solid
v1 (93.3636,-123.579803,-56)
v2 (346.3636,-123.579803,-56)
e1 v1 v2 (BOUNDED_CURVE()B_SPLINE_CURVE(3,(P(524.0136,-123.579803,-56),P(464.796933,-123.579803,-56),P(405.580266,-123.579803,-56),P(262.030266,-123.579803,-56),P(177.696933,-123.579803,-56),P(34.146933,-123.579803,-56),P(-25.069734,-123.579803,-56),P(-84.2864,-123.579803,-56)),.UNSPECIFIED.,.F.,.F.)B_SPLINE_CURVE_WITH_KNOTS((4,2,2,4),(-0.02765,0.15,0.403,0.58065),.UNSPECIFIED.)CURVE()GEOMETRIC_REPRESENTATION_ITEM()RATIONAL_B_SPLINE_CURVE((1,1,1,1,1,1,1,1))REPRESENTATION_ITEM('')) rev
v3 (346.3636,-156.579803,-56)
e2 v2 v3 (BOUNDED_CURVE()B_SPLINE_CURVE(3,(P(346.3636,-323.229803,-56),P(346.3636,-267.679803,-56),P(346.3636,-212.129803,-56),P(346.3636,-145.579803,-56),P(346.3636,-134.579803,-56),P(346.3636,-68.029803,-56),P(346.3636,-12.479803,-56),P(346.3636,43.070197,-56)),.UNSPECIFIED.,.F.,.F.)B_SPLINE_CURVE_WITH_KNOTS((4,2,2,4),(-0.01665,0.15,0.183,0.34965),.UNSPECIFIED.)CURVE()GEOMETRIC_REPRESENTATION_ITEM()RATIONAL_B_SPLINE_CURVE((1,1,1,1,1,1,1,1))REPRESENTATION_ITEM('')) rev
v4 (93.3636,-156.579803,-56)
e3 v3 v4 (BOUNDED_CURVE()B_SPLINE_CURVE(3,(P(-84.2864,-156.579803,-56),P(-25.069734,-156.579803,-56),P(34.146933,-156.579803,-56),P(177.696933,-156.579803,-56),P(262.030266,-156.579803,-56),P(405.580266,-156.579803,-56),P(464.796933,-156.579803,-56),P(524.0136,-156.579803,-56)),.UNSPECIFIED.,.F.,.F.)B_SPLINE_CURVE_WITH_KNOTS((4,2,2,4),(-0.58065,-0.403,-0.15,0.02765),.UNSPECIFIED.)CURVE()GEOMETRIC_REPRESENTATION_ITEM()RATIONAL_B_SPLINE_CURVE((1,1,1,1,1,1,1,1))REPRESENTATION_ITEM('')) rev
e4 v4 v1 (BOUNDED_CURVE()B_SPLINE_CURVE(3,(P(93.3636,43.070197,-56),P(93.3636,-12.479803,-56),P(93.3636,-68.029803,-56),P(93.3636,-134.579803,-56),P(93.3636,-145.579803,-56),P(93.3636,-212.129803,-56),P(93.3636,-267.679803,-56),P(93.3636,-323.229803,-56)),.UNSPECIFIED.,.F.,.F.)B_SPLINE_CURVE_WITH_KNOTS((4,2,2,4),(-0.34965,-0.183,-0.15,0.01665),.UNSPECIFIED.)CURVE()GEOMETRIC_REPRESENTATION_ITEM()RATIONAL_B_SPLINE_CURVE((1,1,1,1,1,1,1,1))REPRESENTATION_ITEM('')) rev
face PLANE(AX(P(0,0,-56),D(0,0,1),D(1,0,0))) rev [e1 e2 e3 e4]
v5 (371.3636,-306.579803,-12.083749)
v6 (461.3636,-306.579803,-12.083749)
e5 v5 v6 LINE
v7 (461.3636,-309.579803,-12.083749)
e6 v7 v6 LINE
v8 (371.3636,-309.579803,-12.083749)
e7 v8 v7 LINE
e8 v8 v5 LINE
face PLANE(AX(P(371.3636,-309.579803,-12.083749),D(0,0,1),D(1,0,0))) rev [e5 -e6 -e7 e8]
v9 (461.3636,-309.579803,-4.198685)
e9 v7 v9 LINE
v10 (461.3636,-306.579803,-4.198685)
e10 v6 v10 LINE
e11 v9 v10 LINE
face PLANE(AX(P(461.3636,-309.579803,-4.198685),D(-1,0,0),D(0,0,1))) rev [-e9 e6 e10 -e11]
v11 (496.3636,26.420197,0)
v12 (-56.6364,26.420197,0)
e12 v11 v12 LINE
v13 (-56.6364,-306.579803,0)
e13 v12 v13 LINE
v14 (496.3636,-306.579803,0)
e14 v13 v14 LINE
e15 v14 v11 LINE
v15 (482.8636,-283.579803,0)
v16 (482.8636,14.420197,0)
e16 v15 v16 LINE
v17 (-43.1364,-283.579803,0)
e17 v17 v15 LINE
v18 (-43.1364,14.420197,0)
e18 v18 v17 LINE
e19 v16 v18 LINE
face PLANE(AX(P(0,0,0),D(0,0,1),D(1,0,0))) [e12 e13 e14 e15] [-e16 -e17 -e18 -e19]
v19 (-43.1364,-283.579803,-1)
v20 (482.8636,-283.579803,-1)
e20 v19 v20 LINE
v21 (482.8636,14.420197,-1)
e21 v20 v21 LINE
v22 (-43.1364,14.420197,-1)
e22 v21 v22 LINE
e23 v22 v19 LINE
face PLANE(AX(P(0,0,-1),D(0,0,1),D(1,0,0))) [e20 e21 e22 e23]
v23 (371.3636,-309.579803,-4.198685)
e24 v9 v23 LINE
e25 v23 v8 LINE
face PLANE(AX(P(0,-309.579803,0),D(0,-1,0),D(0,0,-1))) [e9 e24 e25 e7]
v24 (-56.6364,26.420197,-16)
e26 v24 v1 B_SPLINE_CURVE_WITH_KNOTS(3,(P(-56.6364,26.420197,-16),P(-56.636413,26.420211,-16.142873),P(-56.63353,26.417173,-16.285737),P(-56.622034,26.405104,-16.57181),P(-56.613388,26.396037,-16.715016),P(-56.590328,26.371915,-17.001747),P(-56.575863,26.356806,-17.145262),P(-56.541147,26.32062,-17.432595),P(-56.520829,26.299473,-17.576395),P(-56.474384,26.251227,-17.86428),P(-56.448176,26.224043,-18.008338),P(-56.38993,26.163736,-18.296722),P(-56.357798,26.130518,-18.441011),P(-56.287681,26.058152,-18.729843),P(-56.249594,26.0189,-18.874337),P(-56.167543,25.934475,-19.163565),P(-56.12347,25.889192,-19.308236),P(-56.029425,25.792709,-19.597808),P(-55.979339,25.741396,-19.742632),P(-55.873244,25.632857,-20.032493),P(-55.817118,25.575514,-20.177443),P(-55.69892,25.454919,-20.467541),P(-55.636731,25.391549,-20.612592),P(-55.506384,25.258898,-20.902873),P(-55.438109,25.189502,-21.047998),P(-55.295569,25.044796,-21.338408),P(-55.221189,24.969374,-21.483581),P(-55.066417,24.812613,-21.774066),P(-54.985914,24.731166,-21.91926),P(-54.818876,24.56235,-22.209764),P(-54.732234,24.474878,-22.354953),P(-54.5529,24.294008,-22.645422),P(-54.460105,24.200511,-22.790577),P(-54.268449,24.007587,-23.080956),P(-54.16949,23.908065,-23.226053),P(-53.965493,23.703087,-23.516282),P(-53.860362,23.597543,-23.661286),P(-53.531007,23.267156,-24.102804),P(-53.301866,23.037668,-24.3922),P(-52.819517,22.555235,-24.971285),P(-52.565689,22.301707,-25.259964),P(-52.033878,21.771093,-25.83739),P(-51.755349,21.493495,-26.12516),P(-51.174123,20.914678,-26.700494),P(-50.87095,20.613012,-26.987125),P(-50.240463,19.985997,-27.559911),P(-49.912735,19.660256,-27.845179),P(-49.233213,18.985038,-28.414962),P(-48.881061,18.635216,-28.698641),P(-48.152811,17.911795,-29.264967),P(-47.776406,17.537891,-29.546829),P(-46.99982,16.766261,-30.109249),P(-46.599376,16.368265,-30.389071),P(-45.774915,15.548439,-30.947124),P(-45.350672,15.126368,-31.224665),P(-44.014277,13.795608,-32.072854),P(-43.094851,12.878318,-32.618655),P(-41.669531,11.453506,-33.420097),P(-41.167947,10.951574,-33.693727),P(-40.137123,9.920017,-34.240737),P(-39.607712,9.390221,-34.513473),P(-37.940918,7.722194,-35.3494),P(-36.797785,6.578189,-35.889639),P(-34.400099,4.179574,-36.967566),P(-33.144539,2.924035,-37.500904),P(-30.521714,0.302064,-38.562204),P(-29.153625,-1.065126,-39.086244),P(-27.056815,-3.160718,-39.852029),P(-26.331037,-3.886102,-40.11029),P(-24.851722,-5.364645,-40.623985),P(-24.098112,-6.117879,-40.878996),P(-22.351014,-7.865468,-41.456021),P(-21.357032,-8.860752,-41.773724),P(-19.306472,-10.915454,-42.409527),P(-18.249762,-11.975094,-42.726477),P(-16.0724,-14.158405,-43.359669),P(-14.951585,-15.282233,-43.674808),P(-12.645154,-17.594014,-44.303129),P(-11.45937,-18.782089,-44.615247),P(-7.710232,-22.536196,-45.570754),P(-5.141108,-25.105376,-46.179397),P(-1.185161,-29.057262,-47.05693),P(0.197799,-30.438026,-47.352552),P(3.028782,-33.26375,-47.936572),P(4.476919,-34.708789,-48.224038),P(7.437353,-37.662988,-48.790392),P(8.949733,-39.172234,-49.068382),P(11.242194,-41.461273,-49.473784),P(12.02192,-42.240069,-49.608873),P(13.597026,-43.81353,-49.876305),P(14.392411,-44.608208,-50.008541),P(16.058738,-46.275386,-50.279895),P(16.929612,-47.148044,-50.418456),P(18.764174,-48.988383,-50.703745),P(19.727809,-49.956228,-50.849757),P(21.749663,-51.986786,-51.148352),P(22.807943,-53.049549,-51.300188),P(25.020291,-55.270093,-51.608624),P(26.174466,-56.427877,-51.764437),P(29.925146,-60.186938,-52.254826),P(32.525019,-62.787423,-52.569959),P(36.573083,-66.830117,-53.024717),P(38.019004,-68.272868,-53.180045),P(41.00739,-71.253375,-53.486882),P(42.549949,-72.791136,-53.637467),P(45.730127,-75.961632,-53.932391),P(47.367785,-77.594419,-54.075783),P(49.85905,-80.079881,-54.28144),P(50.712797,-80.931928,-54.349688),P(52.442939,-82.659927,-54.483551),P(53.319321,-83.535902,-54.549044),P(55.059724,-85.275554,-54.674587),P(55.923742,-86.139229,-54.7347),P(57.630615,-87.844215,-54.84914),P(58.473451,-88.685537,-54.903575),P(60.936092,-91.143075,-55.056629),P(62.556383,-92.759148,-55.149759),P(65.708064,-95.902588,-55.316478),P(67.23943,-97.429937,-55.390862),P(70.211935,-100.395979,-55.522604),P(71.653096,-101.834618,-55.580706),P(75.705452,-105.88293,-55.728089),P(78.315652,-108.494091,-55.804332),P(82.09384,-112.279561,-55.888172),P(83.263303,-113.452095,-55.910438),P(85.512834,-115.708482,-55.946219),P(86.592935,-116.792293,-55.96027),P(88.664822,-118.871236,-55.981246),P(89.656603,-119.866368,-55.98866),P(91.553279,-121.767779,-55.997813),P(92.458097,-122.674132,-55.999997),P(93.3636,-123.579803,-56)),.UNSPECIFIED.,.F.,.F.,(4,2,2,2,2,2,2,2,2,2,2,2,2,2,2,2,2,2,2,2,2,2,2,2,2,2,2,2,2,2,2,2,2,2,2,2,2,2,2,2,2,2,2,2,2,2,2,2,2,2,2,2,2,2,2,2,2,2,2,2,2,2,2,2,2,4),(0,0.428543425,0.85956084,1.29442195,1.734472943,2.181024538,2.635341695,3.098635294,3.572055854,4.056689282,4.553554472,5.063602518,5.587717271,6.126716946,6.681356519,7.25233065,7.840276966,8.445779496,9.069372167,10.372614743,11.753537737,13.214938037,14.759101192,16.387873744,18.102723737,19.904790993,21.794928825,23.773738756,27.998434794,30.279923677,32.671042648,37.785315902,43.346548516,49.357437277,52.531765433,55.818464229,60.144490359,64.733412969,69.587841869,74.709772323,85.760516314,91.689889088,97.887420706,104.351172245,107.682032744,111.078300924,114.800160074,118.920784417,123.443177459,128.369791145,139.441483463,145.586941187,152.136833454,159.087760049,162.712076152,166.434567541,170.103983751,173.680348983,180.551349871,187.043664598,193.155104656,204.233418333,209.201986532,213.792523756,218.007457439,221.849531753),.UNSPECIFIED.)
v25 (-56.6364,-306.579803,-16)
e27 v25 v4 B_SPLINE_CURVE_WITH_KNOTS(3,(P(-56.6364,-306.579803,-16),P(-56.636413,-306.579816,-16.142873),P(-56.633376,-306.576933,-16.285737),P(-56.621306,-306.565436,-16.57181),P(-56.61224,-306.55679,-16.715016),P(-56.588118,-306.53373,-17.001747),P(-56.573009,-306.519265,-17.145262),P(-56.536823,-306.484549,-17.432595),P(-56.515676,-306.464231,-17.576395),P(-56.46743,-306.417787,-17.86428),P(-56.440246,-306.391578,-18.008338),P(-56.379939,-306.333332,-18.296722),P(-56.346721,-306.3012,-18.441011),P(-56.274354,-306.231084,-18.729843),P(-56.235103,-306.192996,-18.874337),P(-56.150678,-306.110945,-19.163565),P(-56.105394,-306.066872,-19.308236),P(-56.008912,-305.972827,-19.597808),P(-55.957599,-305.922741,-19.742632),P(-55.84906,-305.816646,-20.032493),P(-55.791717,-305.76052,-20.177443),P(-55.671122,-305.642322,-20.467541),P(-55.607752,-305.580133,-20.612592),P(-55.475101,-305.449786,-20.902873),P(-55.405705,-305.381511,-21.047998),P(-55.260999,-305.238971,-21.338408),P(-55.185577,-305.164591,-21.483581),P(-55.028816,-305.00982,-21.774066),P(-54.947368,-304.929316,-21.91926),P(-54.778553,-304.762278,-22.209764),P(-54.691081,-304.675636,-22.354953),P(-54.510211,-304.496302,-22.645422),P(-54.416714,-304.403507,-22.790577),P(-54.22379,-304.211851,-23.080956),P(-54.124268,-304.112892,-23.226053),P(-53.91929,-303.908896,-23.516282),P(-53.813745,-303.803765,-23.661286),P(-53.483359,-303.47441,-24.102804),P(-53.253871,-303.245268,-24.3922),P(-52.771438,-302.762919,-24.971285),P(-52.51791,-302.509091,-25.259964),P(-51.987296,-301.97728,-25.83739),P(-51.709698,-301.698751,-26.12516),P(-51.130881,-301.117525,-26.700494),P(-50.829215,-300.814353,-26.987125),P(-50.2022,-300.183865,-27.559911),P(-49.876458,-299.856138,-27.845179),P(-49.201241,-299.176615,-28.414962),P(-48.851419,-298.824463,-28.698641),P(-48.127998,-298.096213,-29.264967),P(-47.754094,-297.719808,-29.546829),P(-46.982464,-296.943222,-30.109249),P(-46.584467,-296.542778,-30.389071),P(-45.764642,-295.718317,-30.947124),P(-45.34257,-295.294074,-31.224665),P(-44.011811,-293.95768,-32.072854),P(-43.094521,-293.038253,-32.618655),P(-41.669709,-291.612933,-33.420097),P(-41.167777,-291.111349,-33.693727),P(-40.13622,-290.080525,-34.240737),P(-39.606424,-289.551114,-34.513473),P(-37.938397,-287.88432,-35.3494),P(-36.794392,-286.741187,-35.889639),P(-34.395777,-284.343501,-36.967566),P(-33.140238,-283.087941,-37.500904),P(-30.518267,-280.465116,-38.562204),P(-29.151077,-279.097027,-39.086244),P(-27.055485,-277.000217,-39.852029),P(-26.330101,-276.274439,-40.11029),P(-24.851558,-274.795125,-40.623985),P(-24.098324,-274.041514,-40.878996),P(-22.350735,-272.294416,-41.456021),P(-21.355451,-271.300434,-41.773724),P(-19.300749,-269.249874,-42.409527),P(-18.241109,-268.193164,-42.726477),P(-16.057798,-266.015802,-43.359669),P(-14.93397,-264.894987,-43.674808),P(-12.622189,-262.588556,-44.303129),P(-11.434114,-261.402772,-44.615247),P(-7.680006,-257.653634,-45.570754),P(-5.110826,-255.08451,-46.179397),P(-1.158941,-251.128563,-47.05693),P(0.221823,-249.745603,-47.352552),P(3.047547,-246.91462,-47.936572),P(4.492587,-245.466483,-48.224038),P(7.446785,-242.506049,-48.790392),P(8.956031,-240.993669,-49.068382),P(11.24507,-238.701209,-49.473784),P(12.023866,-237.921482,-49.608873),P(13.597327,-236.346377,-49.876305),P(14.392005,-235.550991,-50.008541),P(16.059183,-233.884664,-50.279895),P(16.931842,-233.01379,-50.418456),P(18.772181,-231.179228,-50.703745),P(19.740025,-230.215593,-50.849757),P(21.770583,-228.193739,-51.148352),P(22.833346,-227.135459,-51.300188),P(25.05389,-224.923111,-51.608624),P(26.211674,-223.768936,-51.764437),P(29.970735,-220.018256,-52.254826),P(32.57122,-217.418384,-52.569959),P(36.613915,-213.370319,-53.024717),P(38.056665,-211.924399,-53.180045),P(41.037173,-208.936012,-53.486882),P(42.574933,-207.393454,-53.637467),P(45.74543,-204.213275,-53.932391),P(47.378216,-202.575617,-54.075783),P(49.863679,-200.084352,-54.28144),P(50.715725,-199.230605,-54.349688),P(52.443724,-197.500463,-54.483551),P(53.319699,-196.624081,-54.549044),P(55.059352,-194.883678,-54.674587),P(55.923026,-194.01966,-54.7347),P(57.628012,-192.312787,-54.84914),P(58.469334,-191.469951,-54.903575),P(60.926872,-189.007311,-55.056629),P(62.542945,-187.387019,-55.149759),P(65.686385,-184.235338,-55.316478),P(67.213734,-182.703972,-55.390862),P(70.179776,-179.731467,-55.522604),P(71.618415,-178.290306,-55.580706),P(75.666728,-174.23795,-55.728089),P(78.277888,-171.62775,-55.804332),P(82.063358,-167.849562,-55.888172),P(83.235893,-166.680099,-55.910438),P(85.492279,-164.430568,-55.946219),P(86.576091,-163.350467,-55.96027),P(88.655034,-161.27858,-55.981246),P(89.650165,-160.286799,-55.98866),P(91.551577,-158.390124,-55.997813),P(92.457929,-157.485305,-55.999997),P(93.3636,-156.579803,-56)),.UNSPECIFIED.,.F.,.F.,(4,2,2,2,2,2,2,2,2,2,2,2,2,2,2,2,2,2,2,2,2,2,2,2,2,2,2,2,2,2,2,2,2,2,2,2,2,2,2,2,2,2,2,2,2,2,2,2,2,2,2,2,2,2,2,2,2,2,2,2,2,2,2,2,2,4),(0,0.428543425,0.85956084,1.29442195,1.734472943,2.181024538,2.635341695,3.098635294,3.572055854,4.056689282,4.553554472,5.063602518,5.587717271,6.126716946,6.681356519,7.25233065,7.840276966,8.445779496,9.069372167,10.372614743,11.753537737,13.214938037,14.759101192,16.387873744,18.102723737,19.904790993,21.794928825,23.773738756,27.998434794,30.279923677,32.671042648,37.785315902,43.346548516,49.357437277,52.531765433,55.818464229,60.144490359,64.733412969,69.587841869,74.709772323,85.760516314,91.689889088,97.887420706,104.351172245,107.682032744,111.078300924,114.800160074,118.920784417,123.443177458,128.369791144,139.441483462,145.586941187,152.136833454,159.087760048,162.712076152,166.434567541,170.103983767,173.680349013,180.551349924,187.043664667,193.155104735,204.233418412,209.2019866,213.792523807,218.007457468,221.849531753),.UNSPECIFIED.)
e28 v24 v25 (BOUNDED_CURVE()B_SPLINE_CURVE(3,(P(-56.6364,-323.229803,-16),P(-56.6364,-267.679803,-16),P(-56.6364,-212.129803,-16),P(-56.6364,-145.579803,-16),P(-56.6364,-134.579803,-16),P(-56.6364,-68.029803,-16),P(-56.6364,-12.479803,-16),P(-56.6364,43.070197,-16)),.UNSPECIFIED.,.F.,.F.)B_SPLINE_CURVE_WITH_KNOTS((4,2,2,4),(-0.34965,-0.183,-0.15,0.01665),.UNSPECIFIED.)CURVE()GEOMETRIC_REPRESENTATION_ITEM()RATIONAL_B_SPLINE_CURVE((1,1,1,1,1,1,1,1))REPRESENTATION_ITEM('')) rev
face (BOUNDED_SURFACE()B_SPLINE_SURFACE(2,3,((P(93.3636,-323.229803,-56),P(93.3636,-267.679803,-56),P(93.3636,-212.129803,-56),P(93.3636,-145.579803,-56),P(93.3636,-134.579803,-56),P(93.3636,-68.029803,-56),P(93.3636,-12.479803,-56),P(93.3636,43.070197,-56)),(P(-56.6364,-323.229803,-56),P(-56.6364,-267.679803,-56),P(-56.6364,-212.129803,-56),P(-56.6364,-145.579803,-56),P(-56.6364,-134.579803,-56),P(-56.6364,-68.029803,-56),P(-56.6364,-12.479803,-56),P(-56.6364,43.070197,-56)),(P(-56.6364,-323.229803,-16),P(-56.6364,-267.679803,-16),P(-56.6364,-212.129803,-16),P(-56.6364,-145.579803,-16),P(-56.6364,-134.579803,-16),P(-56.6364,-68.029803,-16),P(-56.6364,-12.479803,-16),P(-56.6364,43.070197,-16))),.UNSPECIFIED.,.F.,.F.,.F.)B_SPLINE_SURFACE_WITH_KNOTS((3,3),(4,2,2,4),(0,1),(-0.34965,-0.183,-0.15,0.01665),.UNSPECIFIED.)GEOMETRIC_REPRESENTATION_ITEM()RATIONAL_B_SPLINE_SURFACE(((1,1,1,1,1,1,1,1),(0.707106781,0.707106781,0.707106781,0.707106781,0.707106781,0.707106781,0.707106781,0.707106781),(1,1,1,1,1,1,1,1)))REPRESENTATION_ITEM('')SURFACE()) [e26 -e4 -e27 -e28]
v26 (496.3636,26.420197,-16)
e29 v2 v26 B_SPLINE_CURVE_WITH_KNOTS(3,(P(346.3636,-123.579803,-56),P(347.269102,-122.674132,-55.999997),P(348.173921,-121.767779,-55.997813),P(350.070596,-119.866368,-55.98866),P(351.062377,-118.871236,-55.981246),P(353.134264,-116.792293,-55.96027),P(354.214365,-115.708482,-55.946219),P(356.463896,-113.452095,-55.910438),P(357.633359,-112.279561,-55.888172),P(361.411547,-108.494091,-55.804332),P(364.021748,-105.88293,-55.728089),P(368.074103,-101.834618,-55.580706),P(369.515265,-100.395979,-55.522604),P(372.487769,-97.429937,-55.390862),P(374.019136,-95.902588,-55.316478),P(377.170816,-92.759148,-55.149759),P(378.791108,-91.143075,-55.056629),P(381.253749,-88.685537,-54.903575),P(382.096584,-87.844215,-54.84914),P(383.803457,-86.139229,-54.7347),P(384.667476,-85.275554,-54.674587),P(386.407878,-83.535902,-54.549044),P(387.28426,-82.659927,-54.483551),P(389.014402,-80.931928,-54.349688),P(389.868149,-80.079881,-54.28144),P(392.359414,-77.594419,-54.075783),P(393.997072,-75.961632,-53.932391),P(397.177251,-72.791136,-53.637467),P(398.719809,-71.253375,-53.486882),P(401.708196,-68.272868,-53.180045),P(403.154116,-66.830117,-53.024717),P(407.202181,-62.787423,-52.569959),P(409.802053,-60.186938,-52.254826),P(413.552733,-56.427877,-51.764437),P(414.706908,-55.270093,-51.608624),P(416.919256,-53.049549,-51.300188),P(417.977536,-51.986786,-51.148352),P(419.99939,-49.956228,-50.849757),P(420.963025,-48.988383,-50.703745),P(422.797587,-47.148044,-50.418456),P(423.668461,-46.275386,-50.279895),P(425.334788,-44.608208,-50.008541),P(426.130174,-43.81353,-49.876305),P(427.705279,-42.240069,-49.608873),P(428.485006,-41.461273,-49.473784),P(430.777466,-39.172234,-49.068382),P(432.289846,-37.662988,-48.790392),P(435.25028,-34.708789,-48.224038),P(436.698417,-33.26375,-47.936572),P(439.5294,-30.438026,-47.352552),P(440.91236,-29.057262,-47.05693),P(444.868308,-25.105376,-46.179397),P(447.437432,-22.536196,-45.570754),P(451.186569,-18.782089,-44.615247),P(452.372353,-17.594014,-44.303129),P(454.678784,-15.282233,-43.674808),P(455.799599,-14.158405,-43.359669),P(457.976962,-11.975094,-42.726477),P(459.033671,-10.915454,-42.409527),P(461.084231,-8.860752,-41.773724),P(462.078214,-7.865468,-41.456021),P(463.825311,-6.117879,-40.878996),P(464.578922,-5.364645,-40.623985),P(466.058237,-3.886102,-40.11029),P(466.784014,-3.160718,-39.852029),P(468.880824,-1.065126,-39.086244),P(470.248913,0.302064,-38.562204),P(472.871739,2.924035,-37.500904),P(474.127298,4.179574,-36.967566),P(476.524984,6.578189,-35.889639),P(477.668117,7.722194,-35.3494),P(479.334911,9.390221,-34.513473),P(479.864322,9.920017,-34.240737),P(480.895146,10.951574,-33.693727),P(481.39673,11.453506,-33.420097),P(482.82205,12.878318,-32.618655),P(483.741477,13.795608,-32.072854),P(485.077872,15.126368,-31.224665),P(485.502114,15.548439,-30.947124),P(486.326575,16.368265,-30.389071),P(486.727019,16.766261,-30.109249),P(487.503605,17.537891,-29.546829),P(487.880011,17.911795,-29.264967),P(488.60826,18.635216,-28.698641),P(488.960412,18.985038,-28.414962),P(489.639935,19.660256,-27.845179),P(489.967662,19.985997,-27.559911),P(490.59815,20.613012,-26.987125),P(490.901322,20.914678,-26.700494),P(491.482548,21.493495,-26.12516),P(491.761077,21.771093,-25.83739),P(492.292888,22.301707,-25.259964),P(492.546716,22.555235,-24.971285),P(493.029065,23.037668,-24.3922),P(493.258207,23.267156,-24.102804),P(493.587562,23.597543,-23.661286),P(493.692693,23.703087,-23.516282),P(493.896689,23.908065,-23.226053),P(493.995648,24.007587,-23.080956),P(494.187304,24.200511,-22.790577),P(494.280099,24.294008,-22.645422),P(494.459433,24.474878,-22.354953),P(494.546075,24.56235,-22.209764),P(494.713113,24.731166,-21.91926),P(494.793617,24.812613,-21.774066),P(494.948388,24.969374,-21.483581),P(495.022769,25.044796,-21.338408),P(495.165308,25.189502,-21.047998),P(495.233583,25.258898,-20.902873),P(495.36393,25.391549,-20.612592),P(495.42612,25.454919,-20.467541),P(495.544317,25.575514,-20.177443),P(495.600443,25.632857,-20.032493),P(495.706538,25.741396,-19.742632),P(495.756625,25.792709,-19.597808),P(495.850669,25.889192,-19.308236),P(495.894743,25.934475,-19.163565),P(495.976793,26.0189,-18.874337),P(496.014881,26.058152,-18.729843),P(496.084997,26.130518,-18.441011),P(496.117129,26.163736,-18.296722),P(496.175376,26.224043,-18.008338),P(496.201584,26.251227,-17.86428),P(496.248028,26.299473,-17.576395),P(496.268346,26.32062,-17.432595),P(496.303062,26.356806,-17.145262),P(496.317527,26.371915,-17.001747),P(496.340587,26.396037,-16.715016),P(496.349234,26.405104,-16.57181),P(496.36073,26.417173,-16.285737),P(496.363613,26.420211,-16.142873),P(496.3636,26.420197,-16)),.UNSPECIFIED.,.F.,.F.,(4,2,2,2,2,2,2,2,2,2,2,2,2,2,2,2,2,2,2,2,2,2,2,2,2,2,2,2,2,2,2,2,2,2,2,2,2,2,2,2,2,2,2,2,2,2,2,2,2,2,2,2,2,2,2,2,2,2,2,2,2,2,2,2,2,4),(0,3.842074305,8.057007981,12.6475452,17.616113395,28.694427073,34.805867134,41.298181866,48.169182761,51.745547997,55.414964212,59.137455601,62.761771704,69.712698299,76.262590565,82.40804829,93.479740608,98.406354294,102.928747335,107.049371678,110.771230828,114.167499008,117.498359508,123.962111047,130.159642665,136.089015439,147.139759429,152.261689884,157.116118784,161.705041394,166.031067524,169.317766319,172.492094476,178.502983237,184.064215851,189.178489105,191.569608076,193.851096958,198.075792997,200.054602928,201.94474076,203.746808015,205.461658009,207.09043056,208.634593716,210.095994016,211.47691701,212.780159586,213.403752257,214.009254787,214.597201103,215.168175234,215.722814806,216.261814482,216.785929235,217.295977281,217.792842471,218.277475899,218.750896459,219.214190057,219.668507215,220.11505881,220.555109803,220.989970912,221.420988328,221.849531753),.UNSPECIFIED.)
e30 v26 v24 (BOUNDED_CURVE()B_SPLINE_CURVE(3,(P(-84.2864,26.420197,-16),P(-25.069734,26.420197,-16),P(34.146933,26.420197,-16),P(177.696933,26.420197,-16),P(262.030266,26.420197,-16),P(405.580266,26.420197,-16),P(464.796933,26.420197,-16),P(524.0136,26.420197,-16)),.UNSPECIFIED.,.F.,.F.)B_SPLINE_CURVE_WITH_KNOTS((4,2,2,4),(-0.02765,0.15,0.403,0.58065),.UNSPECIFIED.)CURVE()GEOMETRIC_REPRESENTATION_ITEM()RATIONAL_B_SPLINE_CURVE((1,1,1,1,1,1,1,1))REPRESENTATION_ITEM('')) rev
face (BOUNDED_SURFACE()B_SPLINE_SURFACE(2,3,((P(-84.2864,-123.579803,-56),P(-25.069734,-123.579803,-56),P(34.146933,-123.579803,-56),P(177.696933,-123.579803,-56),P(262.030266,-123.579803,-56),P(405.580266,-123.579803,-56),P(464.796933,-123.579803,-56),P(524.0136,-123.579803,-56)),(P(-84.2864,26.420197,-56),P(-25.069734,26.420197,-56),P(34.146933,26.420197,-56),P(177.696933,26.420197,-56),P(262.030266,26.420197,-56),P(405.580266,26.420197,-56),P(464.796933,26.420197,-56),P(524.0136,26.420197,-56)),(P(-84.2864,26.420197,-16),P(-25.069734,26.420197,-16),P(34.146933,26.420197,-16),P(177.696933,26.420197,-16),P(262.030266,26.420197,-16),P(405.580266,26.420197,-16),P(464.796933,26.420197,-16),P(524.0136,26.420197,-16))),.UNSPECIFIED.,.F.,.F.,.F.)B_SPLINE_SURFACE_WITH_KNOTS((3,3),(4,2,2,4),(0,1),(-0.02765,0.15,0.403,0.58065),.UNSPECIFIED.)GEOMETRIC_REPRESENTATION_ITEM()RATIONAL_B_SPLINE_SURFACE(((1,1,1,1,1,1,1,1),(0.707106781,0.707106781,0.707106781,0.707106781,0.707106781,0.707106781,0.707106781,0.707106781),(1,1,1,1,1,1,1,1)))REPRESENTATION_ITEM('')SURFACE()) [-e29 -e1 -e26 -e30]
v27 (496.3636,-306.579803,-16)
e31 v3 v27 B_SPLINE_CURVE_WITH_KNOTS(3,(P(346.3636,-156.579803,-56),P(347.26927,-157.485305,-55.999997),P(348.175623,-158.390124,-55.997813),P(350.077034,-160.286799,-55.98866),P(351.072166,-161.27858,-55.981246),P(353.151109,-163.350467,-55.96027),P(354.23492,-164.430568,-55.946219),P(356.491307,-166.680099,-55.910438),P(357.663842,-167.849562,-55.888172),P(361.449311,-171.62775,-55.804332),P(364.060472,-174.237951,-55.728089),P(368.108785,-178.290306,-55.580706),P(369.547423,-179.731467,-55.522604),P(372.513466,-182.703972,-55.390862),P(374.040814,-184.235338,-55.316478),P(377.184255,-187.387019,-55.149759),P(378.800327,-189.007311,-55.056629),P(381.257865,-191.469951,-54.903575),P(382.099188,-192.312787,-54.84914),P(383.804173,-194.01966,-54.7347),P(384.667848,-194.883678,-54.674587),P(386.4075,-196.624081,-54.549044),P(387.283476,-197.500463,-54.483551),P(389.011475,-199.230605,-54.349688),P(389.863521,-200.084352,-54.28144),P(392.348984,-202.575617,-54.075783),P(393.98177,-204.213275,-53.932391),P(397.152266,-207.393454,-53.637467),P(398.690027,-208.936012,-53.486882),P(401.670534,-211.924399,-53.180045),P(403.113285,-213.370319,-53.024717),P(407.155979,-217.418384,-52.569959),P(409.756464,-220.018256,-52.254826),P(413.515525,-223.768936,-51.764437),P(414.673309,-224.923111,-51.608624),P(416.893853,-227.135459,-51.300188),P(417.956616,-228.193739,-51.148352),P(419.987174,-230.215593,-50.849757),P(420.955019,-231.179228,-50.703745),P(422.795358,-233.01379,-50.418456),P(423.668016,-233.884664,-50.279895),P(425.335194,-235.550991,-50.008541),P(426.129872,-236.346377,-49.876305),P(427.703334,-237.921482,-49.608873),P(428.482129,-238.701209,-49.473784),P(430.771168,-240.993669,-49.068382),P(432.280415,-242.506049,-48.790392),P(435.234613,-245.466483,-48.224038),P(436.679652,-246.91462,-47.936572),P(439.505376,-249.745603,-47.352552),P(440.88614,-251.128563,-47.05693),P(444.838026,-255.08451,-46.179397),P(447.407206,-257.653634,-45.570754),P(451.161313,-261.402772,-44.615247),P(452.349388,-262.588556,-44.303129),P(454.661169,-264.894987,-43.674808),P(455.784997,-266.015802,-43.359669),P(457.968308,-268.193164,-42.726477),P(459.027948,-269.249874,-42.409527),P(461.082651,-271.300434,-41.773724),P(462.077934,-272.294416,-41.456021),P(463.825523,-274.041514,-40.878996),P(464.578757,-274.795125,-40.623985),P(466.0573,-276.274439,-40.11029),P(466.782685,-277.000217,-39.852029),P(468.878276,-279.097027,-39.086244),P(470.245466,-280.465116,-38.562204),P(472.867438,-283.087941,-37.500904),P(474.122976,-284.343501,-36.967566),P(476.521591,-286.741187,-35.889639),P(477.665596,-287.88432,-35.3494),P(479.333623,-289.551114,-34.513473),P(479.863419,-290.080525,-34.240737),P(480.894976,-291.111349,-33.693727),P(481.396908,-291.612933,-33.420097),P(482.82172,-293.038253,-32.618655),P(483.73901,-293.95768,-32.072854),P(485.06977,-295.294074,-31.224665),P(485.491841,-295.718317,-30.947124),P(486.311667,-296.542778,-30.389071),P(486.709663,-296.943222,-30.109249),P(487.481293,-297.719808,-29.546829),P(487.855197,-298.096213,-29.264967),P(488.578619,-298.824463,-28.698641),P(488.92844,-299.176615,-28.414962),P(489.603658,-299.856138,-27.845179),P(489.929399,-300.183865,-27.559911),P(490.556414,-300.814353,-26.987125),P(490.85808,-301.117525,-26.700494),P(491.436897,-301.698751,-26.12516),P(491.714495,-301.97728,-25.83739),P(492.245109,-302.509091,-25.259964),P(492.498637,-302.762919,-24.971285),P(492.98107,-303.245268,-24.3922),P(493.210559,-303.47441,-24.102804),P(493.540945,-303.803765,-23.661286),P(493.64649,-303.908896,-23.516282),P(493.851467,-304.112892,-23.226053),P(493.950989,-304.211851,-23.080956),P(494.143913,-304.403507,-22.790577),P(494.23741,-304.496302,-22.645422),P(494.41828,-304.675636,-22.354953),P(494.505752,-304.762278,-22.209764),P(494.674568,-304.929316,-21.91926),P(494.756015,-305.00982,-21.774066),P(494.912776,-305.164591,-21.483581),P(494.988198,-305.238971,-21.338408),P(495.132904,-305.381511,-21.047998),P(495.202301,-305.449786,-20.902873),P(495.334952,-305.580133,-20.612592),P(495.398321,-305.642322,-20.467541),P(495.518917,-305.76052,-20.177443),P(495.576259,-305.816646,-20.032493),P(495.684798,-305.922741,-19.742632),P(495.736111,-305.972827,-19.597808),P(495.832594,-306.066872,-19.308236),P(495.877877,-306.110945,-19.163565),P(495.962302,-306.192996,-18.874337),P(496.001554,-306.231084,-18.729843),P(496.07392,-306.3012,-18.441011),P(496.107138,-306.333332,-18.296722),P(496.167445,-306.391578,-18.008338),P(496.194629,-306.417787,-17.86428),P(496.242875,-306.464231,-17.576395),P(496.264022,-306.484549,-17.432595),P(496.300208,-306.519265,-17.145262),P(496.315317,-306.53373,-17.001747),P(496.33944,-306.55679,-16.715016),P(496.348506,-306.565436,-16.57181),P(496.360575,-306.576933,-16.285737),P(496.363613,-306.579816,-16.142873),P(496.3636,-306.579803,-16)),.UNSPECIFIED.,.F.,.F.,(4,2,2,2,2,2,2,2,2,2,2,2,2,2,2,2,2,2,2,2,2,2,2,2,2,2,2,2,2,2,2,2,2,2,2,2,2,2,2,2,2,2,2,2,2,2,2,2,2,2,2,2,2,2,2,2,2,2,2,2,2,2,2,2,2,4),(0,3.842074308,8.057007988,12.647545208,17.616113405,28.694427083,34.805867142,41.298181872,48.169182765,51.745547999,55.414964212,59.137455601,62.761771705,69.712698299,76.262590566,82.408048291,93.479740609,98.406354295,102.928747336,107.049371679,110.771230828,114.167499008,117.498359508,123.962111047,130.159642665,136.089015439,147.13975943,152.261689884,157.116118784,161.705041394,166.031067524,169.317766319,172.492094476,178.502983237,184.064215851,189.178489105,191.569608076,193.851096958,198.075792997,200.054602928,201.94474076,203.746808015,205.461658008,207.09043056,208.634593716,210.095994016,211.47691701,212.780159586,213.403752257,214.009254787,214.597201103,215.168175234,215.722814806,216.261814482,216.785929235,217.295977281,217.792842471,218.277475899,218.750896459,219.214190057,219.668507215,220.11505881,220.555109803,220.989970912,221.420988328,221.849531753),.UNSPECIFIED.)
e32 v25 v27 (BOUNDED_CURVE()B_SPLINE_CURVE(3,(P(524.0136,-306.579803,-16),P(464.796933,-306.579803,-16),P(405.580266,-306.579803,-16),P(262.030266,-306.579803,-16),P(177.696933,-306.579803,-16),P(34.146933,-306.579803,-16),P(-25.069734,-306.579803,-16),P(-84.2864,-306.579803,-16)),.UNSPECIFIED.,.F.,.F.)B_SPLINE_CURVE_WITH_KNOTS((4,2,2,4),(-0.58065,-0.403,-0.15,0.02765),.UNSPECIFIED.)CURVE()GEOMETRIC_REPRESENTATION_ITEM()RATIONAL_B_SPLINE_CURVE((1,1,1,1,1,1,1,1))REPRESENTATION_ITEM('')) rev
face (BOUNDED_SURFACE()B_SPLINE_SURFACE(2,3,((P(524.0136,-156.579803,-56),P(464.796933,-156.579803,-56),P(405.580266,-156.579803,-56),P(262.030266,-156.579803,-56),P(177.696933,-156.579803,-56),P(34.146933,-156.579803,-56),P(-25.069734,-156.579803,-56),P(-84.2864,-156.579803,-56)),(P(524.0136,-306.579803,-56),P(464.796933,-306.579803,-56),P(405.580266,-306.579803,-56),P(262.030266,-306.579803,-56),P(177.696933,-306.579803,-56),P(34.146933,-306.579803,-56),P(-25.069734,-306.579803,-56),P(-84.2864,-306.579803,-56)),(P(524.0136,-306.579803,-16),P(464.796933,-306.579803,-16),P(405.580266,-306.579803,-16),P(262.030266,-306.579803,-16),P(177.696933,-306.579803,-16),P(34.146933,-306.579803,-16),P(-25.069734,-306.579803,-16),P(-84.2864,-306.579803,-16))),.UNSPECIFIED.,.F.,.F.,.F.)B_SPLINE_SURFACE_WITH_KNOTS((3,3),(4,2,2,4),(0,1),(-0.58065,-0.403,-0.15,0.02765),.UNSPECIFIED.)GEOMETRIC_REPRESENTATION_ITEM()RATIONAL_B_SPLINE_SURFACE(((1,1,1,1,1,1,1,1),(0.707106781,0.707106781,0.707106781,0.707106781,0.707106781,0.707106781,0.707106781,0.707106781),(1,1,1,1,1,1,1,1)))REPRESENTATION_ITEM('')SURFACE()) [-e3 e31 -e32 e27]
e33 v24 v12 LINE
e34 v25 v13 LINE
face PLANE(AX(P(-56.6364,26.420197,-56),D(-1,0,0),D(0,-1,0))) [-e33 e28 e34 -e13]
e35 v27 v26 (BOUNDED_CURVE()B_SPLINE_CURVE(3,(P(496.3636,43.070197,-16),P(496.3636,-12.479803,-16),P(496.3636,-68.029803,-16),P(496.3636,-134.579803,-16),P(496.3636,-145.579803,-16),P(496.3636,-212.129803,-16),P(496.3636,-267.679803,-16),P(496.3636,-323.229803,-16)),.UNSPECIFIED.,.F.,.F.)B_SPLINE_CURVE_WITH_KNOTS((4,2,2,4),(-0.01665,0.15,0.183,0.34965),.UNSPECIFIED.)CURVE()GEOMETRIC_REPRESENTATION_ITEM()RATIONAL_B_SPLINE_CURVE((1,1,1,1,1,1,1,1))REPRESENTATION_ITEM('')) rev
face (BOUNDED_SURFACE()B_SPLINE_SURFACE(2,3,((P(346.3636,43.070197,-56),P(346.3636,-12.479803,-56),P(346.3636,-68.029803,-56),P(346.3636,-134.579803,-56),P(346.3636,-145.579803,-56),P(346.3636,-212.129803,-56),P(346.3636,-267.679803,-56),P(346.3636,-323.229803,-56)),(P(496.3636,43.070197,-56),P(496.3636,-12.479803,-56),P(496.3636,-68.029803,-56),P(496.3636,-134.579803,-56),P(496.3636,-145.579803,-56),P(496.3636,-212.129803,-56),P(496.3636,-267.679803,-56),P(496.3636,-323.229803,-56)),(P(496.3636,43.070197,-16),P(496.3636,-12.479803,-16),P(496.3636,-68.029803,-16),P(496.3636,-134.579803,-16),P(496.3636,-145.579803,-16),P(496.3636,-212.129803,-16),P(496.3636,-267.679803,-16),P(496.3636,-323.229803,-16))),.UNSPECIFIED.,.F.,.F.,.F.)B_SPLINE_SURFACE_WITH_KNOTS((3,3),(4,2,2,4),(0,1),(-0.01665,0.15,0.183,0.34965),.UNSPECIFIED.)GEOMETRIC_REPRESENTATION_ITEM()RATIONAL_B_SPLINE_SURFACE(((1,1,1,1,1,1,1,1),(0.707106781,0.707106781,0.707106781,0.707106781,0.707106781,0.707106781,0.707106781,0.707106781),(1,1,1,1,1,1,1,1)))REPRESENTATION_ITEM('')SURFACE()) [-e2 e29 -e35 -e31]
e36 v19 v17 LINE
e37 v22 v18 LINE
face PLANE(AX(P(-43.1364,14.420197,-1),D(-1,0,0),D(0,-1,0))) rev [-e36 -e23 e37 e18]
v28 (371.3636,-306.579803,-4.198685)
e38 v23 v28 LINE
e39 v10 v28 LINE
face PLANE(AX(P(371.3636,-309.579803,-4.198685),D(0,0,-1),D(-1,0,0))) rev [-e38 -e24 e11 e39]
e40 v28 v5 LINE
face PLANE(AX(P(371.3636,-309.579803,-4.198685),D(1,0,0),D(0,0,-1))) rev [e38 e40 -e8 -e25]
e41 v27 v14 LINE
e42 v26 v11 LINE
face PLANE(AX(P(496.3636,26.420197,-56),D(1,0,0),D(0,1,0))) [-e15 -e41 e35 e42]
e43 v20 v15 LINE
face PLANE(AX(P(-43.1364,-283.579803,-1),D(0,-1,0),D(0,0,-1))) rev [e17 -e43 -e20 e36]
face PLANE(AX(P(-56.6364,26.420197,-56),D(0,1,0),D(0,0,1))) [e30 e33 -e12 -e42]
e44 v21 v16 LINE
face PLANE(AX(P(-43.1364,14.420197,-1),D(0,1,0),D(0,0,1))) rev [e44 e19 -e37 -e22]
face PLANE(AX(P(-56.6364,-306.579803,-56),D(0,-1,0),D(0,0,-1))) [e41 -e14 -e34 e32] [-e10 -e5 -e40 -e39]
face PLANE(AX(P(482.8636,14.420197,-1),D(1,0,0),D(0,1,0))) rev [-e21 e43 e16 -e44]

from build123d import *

# Parameters (mm, degrees)
SKETCH_1_W          = 553
SKETCH_1_H          = 333
EXTRUDE_1_DEPTH     = 56
FILLET_1_SIZE       = 40
FILLET_1_SIZE_2     = 150
SKETCH_2_W          = 526
SKETCH_2_H          = 298
CUT_EXTRUDE_1_DEPTH = 1
SKETCH_3_W          = 90
SKETCH_3_H          = 7.88506372
EXTRUDE_2_DEPTH     = 3


with BuildPart() as part:
    # Эскиз1 → Бобышка-Вытянуть1 (new body)
    with BuildSketch(Plane.XY):
        with Locations((219.863599641, -140.079802513)):
            Rectangle(SKETCH_1_W, SKETCH_1_H)
    extrude(amount=-EXTRUDE_1_DEPTH)

    # Скругление1
    # an asymmetric fillet: 150, 40 mm, written as the material it takes off along each edge
    with BuildSketch(Plane(origin=(496.363599641, -306.579802513, -56), x_dir=(0, 0, 1), z_dir=(-1, 0, 0)), Plane(origin=(-56.636400359, 26.420197487, -56), x_dir=(0, 0, 1), z_dir=(1, 0, 0))) as fillet_1_piece_1:
        with BuildLine():
            Bezier((FILLET_1_SIZE, 0), (0, 0), (0, FILLET_1_SIZE_2), weights=[1, 0.707106781, 1])
            Line((0, FILLET_1_SIZE_2), (-3, 150))
            Line((-3, 150), (-3, -3))
            Line((-3, -3), (40, -3))
            Line((40, -3), (FILLET_1_SIZE, 0))
        make_face()
    extrude(amount=553, mode=Mode.SUBTRACT)
    with BuildSketch(Plane(origin=(-56.636400359, -306.579802513, -56), x_dir=(0, 0, 1), z_dir=(0, 1, 0)), Plane(origin=(496.363599641, 26.420197487, -56), x_dir=(0, 0, 1), z_dir=(0, -1, 0))) as fillet_1_piece_2:
        with BuildLine():
            Bezier((FILLET_1_SIZE, 0), (0, 0), (0, FILLET_1_SIZE_2), weights=[1, 0.707106781, 1])
            Line((0, FILLET_1_SIZE_2), (-3, 150))
            Line((-3, 150), (-3, -3))
            Line((-3, -3), (40, -3))
            Line((40, -3), (FILLET_1_SIZE, 0))
        make_face()
    extrude(amount=333, mode=Mode.SUBTRACT)
    with BuildSketch(Plane(origin=(496.363599641, 26.420197487, -56), x_dir=(0, 0, 1), z_dir=(0, -1, 0))) as fillet_1_piece_3a_section:
        with BuildLine():
            Bezier((FILLET_1_SIZE, 0), (0, 0), (0, FILLET_1_SIZE_2), weights=[1, 0.707106781, 1])
            Line((0, FILLET_1_SIZE_2), (-3, 150))
            Line((-3, 150), (-3, -3))
            Line((-3, -3), (40, -3))
            Line((40, -3), (FILLET_1_SIZE, 0))
        make_face()
    fillet_1_piece_3a = extrude(amount=708, mode=Mode.PRIVATE)
    fillet_1_piece_3a = split(fillet_1_piece_3a, bisect_by=Plane(origin=(455.274079594, -306.579802513, -48.919820082), z_dir=(0, -1, 0)), keep=Keep.TOP, mode=Mode.PRIVATE)
    with BuildSketch(Plane(origin=(871.363599641, -306.579802513, -56), x_dir=(0, 0, 1), z_dir=(-1, 0, 0))) as fillet_1_piece_3b_section:
        with BuildLine():
            Bezier((FILLET_1_SIZE, 0), (0, 0), (0, FILLET_1_SIZE_2), weights=[1, 0.707106781, 1])
            Line((0, FILLET_1_SIZE_2), (-3, 150))
            Line((-3, 150), (-3, -3))
            Line((-3, -3), (40, -3))
            Line((40, -3), (FILLET_1_SIZE, 0))
        make_face()
    fillet_1_piece_3b = extrude(amount=928, mode=Mode.PRIVATE)
    fillet_1_piece_3b = split(fillet_1_piece_3b, bisect_by=Plane(origin=(496.363599641, -265.490295874, -48.919826396), z_dir=(1, 0, 0)), keep=Keep.TOP, mode=Mode.PRIVATE)
    fillet_1_piece_3 = fillet_1_piece_3a & fillet_1_piece_3b
    add(fillet_1_piece_3, mode=Mode.SUBTRACT)
    with BuildSketch(Plane(origin=(496.363599641, -306.579802513, -56), x_dir=(0, 0, 1), z_dir=(-1, 0, 0))) as fillet_1_piece_4a_section:
        with BuildLine():
            Bezier((FILLET_1_SIZE, 0), (0, 0), (0, FILLET_1_SIZE_2), weights=[1, 0.707106781, 1])
            Line((0, FILLET_1_SIZE_2), (-3, 150))
            Line((-3, 150), (-3, -3))
            Line((-3, -3), (40, -3))
            Line((40, -3), (FILLET_1_SIZE, 0))
        make_face()
    fillet_1_piece_4a = extrude(amount=928, mode=Mode.PRIVATE)
    fillet_1_piece_4a = split(fillet_1_piece_4a, bisect_by=Plane(origin=(-56.636400359, -265.49028305, -48.919819953), z_dir=(-1, 0, 0)), keep=Keep.TOP, mode=Mode.PRIVATE)
    with BuildSketch(Plane(origin=(-56.636400359, -681.579802513, -56), x_dir=(0, 0, 1), z_dir=(0, 1, 0))) as fillet_1_piece_4b_section:
        with BuildLine():
            Bezier((FILLET_1_SIZE, 0), (0, 0), (0, FILLET_1_SIZE_2), weights=[1, 0.707106781, 1])
            Line((0, FILLET_1_SIZE_2), (-3, 150))
            Line((-3, 150), (-3, -3))
            Line((-3, -3), (40, -3))
            Line((40, -3), (FILLET_1_SIZE, 0))
        make_face()
    fillet_1_piece_4b = extrude(amount=708, mode=Mode.PRIVATE)
    fillet_1_piece_4b = split(fillet_1_piece_4b, bisect_by=Plane(origin=(-15.546893136, -306.579802513, -48.919826525), z_dir=(0, -1, 0)), keep=Keep.TOP, mode=Mode.PRIVATE)
    fillet_1_piece_4 = fillet_1_piece_4a & fillet_1_piece_4b
    add(fillet_1_piece_4, mode=Mode.SUBTRACT)
    with BuildSketch(Plane(origin=(-431.636400359, 26.420197487, -56), x_dir=(0, 0, 1), z_dir=(1, 0, 0))) as fillet_1_piece_5a_section:
        with BuildLine():
            Bezier((FILLET_1_SIZE, 0), (0, 0), (0, FILLET_1_SIZE_2), weights=[1, 0.707106781, 1])
            Line((0, FILLET_1_SIZE_2), (-3, 150))
            Line((-3, 150), (-3, -3))
            Line((-3, -3), (40, -3))
            Line((40, -3), (FILLET_1_SIZE, 0))
        make_face()
    fillet_1_piece_5a = extrude(amount=928, mode=Mode.PRIVATE)
    fillet_1_piece_5a = split(fillet_1_piece_5a, bisect_by=Plane(origin=(-56.636400359, -14.669309261, -48.919826397), z_dir=(-1, 0, 0)), keep=Keep.TOP, mode=Mode.PRIVATE)
    with BuildSketch(Plane(origin=(-56.636400359, -306.579802513, -56), x_dir=(0, 0, 1), z_dir=(0, 1, 0))) as fillet_1_piece_5b_section:
        with BuildLine():
            Bezier((FILLET_1_SIZE, 0), (0, 0), (0, FILLET_1_SIZE_2), weights=[1, 0.707106781, 1])
            Line((0, FILLET_1_SIZE_2), (-3, 150))
            Line((-3, 150), (-3, -3))
            Line((-3, -3), (40, -3))
            Line((40, -3), (FILLET_1_SIZE, 0))
        make_face()
    fillet_1_piece_5b = extrude(amount=708, mode=Mode.PRIVATE)
    fillet_1_piece_5b = split(fillet_1_piece_5b, bisect_by=Plane(origin=(-15.546880312, 26.420197487, -48.919820082), z_dir=(0, 1, 0)), keep=Keep.TOP, mode=Mode.PRIVATE)
    fillet_1_piece_5 = fillet_1_piece_5a & fillet_1_piece_5b
    add(fillet_1_piece_5, mode=Mode.SUBTRACT)
    with BuildSketch(Plane(origin=(-56.636400359, 26.420197487, -56), x_dir=(0, 0, 1), z_dir=(1, 0, 0))) as fillet_1_piece_6a_section:
        with BuildLine():
            Bezier((FILLET_1_SIZE, 0), (0, 0), (0, FILLET_1_SIZE_2), weights=[1, 0.707106781, 1])
            Line((0, FILLET_1_SIZE_2), (-3, 150))
            Line((-3, 150), (-3, -3))
            Line((-3, -3), (40, -3))
            Line((40, -3), (FILLET_1_SIZE, 0))
        make_face()
    fillet_1_piece_6a = extrude(amount=928, mode=Mode.PRIVATE)
    fillet_1_piece_6a = split(fillet_1_piece_6a, bisect_by=Plane(origin=(496.363599641, -14.669322085, -48.919819954), z_dir=(1, 0, 0)), keep=Keep.TOP, mode=Mode.PRIVATE)
    with BuildSketch(Plane(origin=(496.363599641, 401.420197487, -56), x_dir=(0, 0, 1), z_dir=(0, -1, 0))) as fillet_1_piece_6b_section:
        with BuildLine():
            Bezier((FILLET_1_SIZE, 0), (0, 0), (0, FILLET_1_SIZE_2), weights=[1, 0.707106781, 1])
            Line((0, FILLET_1_SIZE_2), (-3, 150))
            Line((-3, 150), (-3, -3))
            Line((-3, -3), (40, -3))
            Line((40, -3), (FILLET_1_SIZE, 0))
        make_face()
    fillet_1_piece_6b = extrude(amount=708, mode=Mode.PRIVATE)
    fillet_1_piece_6b = split(fillet_1_piece_6b, bisect_by=Plane(origin=(455.274092417, 26.420197487, -48.919826525), z_dir=(0, 1, 0)), keep=Keep.TOP, mode=Mode.PRIVATE)
    fillet_1_piece_6 = fillet_1_piece_6a & fillet_1_piece_6b
    add(fillet_1_piece_6, mode=Mode.SUBTRACT)

    # Эскиз2 → Вырез-Вытянуть1 (cut)
    with BuildSketch(Plane.XY):
        with Locations((219.863599641, -134.579802513)):
            Rectangle(SKETCH_2_W, SKETCH_2_H)
    extrude(amount=-CUT_EXTRUDE_1_DEPTH, mode=Mode.SUBTRACT)

    # Эскиз3 → Бобышка-Вытянуть2 (add)
    with BuildSketch(Plane.XZ.offset(306.579802513)):
        with Locations((416.363599641, -8.14121692)):
            Rectangle(SKETCH_3_W, SKETCH_3_H)
    extrude(amount=EXTRUDE_2_DEPTH)


solid = part.part
